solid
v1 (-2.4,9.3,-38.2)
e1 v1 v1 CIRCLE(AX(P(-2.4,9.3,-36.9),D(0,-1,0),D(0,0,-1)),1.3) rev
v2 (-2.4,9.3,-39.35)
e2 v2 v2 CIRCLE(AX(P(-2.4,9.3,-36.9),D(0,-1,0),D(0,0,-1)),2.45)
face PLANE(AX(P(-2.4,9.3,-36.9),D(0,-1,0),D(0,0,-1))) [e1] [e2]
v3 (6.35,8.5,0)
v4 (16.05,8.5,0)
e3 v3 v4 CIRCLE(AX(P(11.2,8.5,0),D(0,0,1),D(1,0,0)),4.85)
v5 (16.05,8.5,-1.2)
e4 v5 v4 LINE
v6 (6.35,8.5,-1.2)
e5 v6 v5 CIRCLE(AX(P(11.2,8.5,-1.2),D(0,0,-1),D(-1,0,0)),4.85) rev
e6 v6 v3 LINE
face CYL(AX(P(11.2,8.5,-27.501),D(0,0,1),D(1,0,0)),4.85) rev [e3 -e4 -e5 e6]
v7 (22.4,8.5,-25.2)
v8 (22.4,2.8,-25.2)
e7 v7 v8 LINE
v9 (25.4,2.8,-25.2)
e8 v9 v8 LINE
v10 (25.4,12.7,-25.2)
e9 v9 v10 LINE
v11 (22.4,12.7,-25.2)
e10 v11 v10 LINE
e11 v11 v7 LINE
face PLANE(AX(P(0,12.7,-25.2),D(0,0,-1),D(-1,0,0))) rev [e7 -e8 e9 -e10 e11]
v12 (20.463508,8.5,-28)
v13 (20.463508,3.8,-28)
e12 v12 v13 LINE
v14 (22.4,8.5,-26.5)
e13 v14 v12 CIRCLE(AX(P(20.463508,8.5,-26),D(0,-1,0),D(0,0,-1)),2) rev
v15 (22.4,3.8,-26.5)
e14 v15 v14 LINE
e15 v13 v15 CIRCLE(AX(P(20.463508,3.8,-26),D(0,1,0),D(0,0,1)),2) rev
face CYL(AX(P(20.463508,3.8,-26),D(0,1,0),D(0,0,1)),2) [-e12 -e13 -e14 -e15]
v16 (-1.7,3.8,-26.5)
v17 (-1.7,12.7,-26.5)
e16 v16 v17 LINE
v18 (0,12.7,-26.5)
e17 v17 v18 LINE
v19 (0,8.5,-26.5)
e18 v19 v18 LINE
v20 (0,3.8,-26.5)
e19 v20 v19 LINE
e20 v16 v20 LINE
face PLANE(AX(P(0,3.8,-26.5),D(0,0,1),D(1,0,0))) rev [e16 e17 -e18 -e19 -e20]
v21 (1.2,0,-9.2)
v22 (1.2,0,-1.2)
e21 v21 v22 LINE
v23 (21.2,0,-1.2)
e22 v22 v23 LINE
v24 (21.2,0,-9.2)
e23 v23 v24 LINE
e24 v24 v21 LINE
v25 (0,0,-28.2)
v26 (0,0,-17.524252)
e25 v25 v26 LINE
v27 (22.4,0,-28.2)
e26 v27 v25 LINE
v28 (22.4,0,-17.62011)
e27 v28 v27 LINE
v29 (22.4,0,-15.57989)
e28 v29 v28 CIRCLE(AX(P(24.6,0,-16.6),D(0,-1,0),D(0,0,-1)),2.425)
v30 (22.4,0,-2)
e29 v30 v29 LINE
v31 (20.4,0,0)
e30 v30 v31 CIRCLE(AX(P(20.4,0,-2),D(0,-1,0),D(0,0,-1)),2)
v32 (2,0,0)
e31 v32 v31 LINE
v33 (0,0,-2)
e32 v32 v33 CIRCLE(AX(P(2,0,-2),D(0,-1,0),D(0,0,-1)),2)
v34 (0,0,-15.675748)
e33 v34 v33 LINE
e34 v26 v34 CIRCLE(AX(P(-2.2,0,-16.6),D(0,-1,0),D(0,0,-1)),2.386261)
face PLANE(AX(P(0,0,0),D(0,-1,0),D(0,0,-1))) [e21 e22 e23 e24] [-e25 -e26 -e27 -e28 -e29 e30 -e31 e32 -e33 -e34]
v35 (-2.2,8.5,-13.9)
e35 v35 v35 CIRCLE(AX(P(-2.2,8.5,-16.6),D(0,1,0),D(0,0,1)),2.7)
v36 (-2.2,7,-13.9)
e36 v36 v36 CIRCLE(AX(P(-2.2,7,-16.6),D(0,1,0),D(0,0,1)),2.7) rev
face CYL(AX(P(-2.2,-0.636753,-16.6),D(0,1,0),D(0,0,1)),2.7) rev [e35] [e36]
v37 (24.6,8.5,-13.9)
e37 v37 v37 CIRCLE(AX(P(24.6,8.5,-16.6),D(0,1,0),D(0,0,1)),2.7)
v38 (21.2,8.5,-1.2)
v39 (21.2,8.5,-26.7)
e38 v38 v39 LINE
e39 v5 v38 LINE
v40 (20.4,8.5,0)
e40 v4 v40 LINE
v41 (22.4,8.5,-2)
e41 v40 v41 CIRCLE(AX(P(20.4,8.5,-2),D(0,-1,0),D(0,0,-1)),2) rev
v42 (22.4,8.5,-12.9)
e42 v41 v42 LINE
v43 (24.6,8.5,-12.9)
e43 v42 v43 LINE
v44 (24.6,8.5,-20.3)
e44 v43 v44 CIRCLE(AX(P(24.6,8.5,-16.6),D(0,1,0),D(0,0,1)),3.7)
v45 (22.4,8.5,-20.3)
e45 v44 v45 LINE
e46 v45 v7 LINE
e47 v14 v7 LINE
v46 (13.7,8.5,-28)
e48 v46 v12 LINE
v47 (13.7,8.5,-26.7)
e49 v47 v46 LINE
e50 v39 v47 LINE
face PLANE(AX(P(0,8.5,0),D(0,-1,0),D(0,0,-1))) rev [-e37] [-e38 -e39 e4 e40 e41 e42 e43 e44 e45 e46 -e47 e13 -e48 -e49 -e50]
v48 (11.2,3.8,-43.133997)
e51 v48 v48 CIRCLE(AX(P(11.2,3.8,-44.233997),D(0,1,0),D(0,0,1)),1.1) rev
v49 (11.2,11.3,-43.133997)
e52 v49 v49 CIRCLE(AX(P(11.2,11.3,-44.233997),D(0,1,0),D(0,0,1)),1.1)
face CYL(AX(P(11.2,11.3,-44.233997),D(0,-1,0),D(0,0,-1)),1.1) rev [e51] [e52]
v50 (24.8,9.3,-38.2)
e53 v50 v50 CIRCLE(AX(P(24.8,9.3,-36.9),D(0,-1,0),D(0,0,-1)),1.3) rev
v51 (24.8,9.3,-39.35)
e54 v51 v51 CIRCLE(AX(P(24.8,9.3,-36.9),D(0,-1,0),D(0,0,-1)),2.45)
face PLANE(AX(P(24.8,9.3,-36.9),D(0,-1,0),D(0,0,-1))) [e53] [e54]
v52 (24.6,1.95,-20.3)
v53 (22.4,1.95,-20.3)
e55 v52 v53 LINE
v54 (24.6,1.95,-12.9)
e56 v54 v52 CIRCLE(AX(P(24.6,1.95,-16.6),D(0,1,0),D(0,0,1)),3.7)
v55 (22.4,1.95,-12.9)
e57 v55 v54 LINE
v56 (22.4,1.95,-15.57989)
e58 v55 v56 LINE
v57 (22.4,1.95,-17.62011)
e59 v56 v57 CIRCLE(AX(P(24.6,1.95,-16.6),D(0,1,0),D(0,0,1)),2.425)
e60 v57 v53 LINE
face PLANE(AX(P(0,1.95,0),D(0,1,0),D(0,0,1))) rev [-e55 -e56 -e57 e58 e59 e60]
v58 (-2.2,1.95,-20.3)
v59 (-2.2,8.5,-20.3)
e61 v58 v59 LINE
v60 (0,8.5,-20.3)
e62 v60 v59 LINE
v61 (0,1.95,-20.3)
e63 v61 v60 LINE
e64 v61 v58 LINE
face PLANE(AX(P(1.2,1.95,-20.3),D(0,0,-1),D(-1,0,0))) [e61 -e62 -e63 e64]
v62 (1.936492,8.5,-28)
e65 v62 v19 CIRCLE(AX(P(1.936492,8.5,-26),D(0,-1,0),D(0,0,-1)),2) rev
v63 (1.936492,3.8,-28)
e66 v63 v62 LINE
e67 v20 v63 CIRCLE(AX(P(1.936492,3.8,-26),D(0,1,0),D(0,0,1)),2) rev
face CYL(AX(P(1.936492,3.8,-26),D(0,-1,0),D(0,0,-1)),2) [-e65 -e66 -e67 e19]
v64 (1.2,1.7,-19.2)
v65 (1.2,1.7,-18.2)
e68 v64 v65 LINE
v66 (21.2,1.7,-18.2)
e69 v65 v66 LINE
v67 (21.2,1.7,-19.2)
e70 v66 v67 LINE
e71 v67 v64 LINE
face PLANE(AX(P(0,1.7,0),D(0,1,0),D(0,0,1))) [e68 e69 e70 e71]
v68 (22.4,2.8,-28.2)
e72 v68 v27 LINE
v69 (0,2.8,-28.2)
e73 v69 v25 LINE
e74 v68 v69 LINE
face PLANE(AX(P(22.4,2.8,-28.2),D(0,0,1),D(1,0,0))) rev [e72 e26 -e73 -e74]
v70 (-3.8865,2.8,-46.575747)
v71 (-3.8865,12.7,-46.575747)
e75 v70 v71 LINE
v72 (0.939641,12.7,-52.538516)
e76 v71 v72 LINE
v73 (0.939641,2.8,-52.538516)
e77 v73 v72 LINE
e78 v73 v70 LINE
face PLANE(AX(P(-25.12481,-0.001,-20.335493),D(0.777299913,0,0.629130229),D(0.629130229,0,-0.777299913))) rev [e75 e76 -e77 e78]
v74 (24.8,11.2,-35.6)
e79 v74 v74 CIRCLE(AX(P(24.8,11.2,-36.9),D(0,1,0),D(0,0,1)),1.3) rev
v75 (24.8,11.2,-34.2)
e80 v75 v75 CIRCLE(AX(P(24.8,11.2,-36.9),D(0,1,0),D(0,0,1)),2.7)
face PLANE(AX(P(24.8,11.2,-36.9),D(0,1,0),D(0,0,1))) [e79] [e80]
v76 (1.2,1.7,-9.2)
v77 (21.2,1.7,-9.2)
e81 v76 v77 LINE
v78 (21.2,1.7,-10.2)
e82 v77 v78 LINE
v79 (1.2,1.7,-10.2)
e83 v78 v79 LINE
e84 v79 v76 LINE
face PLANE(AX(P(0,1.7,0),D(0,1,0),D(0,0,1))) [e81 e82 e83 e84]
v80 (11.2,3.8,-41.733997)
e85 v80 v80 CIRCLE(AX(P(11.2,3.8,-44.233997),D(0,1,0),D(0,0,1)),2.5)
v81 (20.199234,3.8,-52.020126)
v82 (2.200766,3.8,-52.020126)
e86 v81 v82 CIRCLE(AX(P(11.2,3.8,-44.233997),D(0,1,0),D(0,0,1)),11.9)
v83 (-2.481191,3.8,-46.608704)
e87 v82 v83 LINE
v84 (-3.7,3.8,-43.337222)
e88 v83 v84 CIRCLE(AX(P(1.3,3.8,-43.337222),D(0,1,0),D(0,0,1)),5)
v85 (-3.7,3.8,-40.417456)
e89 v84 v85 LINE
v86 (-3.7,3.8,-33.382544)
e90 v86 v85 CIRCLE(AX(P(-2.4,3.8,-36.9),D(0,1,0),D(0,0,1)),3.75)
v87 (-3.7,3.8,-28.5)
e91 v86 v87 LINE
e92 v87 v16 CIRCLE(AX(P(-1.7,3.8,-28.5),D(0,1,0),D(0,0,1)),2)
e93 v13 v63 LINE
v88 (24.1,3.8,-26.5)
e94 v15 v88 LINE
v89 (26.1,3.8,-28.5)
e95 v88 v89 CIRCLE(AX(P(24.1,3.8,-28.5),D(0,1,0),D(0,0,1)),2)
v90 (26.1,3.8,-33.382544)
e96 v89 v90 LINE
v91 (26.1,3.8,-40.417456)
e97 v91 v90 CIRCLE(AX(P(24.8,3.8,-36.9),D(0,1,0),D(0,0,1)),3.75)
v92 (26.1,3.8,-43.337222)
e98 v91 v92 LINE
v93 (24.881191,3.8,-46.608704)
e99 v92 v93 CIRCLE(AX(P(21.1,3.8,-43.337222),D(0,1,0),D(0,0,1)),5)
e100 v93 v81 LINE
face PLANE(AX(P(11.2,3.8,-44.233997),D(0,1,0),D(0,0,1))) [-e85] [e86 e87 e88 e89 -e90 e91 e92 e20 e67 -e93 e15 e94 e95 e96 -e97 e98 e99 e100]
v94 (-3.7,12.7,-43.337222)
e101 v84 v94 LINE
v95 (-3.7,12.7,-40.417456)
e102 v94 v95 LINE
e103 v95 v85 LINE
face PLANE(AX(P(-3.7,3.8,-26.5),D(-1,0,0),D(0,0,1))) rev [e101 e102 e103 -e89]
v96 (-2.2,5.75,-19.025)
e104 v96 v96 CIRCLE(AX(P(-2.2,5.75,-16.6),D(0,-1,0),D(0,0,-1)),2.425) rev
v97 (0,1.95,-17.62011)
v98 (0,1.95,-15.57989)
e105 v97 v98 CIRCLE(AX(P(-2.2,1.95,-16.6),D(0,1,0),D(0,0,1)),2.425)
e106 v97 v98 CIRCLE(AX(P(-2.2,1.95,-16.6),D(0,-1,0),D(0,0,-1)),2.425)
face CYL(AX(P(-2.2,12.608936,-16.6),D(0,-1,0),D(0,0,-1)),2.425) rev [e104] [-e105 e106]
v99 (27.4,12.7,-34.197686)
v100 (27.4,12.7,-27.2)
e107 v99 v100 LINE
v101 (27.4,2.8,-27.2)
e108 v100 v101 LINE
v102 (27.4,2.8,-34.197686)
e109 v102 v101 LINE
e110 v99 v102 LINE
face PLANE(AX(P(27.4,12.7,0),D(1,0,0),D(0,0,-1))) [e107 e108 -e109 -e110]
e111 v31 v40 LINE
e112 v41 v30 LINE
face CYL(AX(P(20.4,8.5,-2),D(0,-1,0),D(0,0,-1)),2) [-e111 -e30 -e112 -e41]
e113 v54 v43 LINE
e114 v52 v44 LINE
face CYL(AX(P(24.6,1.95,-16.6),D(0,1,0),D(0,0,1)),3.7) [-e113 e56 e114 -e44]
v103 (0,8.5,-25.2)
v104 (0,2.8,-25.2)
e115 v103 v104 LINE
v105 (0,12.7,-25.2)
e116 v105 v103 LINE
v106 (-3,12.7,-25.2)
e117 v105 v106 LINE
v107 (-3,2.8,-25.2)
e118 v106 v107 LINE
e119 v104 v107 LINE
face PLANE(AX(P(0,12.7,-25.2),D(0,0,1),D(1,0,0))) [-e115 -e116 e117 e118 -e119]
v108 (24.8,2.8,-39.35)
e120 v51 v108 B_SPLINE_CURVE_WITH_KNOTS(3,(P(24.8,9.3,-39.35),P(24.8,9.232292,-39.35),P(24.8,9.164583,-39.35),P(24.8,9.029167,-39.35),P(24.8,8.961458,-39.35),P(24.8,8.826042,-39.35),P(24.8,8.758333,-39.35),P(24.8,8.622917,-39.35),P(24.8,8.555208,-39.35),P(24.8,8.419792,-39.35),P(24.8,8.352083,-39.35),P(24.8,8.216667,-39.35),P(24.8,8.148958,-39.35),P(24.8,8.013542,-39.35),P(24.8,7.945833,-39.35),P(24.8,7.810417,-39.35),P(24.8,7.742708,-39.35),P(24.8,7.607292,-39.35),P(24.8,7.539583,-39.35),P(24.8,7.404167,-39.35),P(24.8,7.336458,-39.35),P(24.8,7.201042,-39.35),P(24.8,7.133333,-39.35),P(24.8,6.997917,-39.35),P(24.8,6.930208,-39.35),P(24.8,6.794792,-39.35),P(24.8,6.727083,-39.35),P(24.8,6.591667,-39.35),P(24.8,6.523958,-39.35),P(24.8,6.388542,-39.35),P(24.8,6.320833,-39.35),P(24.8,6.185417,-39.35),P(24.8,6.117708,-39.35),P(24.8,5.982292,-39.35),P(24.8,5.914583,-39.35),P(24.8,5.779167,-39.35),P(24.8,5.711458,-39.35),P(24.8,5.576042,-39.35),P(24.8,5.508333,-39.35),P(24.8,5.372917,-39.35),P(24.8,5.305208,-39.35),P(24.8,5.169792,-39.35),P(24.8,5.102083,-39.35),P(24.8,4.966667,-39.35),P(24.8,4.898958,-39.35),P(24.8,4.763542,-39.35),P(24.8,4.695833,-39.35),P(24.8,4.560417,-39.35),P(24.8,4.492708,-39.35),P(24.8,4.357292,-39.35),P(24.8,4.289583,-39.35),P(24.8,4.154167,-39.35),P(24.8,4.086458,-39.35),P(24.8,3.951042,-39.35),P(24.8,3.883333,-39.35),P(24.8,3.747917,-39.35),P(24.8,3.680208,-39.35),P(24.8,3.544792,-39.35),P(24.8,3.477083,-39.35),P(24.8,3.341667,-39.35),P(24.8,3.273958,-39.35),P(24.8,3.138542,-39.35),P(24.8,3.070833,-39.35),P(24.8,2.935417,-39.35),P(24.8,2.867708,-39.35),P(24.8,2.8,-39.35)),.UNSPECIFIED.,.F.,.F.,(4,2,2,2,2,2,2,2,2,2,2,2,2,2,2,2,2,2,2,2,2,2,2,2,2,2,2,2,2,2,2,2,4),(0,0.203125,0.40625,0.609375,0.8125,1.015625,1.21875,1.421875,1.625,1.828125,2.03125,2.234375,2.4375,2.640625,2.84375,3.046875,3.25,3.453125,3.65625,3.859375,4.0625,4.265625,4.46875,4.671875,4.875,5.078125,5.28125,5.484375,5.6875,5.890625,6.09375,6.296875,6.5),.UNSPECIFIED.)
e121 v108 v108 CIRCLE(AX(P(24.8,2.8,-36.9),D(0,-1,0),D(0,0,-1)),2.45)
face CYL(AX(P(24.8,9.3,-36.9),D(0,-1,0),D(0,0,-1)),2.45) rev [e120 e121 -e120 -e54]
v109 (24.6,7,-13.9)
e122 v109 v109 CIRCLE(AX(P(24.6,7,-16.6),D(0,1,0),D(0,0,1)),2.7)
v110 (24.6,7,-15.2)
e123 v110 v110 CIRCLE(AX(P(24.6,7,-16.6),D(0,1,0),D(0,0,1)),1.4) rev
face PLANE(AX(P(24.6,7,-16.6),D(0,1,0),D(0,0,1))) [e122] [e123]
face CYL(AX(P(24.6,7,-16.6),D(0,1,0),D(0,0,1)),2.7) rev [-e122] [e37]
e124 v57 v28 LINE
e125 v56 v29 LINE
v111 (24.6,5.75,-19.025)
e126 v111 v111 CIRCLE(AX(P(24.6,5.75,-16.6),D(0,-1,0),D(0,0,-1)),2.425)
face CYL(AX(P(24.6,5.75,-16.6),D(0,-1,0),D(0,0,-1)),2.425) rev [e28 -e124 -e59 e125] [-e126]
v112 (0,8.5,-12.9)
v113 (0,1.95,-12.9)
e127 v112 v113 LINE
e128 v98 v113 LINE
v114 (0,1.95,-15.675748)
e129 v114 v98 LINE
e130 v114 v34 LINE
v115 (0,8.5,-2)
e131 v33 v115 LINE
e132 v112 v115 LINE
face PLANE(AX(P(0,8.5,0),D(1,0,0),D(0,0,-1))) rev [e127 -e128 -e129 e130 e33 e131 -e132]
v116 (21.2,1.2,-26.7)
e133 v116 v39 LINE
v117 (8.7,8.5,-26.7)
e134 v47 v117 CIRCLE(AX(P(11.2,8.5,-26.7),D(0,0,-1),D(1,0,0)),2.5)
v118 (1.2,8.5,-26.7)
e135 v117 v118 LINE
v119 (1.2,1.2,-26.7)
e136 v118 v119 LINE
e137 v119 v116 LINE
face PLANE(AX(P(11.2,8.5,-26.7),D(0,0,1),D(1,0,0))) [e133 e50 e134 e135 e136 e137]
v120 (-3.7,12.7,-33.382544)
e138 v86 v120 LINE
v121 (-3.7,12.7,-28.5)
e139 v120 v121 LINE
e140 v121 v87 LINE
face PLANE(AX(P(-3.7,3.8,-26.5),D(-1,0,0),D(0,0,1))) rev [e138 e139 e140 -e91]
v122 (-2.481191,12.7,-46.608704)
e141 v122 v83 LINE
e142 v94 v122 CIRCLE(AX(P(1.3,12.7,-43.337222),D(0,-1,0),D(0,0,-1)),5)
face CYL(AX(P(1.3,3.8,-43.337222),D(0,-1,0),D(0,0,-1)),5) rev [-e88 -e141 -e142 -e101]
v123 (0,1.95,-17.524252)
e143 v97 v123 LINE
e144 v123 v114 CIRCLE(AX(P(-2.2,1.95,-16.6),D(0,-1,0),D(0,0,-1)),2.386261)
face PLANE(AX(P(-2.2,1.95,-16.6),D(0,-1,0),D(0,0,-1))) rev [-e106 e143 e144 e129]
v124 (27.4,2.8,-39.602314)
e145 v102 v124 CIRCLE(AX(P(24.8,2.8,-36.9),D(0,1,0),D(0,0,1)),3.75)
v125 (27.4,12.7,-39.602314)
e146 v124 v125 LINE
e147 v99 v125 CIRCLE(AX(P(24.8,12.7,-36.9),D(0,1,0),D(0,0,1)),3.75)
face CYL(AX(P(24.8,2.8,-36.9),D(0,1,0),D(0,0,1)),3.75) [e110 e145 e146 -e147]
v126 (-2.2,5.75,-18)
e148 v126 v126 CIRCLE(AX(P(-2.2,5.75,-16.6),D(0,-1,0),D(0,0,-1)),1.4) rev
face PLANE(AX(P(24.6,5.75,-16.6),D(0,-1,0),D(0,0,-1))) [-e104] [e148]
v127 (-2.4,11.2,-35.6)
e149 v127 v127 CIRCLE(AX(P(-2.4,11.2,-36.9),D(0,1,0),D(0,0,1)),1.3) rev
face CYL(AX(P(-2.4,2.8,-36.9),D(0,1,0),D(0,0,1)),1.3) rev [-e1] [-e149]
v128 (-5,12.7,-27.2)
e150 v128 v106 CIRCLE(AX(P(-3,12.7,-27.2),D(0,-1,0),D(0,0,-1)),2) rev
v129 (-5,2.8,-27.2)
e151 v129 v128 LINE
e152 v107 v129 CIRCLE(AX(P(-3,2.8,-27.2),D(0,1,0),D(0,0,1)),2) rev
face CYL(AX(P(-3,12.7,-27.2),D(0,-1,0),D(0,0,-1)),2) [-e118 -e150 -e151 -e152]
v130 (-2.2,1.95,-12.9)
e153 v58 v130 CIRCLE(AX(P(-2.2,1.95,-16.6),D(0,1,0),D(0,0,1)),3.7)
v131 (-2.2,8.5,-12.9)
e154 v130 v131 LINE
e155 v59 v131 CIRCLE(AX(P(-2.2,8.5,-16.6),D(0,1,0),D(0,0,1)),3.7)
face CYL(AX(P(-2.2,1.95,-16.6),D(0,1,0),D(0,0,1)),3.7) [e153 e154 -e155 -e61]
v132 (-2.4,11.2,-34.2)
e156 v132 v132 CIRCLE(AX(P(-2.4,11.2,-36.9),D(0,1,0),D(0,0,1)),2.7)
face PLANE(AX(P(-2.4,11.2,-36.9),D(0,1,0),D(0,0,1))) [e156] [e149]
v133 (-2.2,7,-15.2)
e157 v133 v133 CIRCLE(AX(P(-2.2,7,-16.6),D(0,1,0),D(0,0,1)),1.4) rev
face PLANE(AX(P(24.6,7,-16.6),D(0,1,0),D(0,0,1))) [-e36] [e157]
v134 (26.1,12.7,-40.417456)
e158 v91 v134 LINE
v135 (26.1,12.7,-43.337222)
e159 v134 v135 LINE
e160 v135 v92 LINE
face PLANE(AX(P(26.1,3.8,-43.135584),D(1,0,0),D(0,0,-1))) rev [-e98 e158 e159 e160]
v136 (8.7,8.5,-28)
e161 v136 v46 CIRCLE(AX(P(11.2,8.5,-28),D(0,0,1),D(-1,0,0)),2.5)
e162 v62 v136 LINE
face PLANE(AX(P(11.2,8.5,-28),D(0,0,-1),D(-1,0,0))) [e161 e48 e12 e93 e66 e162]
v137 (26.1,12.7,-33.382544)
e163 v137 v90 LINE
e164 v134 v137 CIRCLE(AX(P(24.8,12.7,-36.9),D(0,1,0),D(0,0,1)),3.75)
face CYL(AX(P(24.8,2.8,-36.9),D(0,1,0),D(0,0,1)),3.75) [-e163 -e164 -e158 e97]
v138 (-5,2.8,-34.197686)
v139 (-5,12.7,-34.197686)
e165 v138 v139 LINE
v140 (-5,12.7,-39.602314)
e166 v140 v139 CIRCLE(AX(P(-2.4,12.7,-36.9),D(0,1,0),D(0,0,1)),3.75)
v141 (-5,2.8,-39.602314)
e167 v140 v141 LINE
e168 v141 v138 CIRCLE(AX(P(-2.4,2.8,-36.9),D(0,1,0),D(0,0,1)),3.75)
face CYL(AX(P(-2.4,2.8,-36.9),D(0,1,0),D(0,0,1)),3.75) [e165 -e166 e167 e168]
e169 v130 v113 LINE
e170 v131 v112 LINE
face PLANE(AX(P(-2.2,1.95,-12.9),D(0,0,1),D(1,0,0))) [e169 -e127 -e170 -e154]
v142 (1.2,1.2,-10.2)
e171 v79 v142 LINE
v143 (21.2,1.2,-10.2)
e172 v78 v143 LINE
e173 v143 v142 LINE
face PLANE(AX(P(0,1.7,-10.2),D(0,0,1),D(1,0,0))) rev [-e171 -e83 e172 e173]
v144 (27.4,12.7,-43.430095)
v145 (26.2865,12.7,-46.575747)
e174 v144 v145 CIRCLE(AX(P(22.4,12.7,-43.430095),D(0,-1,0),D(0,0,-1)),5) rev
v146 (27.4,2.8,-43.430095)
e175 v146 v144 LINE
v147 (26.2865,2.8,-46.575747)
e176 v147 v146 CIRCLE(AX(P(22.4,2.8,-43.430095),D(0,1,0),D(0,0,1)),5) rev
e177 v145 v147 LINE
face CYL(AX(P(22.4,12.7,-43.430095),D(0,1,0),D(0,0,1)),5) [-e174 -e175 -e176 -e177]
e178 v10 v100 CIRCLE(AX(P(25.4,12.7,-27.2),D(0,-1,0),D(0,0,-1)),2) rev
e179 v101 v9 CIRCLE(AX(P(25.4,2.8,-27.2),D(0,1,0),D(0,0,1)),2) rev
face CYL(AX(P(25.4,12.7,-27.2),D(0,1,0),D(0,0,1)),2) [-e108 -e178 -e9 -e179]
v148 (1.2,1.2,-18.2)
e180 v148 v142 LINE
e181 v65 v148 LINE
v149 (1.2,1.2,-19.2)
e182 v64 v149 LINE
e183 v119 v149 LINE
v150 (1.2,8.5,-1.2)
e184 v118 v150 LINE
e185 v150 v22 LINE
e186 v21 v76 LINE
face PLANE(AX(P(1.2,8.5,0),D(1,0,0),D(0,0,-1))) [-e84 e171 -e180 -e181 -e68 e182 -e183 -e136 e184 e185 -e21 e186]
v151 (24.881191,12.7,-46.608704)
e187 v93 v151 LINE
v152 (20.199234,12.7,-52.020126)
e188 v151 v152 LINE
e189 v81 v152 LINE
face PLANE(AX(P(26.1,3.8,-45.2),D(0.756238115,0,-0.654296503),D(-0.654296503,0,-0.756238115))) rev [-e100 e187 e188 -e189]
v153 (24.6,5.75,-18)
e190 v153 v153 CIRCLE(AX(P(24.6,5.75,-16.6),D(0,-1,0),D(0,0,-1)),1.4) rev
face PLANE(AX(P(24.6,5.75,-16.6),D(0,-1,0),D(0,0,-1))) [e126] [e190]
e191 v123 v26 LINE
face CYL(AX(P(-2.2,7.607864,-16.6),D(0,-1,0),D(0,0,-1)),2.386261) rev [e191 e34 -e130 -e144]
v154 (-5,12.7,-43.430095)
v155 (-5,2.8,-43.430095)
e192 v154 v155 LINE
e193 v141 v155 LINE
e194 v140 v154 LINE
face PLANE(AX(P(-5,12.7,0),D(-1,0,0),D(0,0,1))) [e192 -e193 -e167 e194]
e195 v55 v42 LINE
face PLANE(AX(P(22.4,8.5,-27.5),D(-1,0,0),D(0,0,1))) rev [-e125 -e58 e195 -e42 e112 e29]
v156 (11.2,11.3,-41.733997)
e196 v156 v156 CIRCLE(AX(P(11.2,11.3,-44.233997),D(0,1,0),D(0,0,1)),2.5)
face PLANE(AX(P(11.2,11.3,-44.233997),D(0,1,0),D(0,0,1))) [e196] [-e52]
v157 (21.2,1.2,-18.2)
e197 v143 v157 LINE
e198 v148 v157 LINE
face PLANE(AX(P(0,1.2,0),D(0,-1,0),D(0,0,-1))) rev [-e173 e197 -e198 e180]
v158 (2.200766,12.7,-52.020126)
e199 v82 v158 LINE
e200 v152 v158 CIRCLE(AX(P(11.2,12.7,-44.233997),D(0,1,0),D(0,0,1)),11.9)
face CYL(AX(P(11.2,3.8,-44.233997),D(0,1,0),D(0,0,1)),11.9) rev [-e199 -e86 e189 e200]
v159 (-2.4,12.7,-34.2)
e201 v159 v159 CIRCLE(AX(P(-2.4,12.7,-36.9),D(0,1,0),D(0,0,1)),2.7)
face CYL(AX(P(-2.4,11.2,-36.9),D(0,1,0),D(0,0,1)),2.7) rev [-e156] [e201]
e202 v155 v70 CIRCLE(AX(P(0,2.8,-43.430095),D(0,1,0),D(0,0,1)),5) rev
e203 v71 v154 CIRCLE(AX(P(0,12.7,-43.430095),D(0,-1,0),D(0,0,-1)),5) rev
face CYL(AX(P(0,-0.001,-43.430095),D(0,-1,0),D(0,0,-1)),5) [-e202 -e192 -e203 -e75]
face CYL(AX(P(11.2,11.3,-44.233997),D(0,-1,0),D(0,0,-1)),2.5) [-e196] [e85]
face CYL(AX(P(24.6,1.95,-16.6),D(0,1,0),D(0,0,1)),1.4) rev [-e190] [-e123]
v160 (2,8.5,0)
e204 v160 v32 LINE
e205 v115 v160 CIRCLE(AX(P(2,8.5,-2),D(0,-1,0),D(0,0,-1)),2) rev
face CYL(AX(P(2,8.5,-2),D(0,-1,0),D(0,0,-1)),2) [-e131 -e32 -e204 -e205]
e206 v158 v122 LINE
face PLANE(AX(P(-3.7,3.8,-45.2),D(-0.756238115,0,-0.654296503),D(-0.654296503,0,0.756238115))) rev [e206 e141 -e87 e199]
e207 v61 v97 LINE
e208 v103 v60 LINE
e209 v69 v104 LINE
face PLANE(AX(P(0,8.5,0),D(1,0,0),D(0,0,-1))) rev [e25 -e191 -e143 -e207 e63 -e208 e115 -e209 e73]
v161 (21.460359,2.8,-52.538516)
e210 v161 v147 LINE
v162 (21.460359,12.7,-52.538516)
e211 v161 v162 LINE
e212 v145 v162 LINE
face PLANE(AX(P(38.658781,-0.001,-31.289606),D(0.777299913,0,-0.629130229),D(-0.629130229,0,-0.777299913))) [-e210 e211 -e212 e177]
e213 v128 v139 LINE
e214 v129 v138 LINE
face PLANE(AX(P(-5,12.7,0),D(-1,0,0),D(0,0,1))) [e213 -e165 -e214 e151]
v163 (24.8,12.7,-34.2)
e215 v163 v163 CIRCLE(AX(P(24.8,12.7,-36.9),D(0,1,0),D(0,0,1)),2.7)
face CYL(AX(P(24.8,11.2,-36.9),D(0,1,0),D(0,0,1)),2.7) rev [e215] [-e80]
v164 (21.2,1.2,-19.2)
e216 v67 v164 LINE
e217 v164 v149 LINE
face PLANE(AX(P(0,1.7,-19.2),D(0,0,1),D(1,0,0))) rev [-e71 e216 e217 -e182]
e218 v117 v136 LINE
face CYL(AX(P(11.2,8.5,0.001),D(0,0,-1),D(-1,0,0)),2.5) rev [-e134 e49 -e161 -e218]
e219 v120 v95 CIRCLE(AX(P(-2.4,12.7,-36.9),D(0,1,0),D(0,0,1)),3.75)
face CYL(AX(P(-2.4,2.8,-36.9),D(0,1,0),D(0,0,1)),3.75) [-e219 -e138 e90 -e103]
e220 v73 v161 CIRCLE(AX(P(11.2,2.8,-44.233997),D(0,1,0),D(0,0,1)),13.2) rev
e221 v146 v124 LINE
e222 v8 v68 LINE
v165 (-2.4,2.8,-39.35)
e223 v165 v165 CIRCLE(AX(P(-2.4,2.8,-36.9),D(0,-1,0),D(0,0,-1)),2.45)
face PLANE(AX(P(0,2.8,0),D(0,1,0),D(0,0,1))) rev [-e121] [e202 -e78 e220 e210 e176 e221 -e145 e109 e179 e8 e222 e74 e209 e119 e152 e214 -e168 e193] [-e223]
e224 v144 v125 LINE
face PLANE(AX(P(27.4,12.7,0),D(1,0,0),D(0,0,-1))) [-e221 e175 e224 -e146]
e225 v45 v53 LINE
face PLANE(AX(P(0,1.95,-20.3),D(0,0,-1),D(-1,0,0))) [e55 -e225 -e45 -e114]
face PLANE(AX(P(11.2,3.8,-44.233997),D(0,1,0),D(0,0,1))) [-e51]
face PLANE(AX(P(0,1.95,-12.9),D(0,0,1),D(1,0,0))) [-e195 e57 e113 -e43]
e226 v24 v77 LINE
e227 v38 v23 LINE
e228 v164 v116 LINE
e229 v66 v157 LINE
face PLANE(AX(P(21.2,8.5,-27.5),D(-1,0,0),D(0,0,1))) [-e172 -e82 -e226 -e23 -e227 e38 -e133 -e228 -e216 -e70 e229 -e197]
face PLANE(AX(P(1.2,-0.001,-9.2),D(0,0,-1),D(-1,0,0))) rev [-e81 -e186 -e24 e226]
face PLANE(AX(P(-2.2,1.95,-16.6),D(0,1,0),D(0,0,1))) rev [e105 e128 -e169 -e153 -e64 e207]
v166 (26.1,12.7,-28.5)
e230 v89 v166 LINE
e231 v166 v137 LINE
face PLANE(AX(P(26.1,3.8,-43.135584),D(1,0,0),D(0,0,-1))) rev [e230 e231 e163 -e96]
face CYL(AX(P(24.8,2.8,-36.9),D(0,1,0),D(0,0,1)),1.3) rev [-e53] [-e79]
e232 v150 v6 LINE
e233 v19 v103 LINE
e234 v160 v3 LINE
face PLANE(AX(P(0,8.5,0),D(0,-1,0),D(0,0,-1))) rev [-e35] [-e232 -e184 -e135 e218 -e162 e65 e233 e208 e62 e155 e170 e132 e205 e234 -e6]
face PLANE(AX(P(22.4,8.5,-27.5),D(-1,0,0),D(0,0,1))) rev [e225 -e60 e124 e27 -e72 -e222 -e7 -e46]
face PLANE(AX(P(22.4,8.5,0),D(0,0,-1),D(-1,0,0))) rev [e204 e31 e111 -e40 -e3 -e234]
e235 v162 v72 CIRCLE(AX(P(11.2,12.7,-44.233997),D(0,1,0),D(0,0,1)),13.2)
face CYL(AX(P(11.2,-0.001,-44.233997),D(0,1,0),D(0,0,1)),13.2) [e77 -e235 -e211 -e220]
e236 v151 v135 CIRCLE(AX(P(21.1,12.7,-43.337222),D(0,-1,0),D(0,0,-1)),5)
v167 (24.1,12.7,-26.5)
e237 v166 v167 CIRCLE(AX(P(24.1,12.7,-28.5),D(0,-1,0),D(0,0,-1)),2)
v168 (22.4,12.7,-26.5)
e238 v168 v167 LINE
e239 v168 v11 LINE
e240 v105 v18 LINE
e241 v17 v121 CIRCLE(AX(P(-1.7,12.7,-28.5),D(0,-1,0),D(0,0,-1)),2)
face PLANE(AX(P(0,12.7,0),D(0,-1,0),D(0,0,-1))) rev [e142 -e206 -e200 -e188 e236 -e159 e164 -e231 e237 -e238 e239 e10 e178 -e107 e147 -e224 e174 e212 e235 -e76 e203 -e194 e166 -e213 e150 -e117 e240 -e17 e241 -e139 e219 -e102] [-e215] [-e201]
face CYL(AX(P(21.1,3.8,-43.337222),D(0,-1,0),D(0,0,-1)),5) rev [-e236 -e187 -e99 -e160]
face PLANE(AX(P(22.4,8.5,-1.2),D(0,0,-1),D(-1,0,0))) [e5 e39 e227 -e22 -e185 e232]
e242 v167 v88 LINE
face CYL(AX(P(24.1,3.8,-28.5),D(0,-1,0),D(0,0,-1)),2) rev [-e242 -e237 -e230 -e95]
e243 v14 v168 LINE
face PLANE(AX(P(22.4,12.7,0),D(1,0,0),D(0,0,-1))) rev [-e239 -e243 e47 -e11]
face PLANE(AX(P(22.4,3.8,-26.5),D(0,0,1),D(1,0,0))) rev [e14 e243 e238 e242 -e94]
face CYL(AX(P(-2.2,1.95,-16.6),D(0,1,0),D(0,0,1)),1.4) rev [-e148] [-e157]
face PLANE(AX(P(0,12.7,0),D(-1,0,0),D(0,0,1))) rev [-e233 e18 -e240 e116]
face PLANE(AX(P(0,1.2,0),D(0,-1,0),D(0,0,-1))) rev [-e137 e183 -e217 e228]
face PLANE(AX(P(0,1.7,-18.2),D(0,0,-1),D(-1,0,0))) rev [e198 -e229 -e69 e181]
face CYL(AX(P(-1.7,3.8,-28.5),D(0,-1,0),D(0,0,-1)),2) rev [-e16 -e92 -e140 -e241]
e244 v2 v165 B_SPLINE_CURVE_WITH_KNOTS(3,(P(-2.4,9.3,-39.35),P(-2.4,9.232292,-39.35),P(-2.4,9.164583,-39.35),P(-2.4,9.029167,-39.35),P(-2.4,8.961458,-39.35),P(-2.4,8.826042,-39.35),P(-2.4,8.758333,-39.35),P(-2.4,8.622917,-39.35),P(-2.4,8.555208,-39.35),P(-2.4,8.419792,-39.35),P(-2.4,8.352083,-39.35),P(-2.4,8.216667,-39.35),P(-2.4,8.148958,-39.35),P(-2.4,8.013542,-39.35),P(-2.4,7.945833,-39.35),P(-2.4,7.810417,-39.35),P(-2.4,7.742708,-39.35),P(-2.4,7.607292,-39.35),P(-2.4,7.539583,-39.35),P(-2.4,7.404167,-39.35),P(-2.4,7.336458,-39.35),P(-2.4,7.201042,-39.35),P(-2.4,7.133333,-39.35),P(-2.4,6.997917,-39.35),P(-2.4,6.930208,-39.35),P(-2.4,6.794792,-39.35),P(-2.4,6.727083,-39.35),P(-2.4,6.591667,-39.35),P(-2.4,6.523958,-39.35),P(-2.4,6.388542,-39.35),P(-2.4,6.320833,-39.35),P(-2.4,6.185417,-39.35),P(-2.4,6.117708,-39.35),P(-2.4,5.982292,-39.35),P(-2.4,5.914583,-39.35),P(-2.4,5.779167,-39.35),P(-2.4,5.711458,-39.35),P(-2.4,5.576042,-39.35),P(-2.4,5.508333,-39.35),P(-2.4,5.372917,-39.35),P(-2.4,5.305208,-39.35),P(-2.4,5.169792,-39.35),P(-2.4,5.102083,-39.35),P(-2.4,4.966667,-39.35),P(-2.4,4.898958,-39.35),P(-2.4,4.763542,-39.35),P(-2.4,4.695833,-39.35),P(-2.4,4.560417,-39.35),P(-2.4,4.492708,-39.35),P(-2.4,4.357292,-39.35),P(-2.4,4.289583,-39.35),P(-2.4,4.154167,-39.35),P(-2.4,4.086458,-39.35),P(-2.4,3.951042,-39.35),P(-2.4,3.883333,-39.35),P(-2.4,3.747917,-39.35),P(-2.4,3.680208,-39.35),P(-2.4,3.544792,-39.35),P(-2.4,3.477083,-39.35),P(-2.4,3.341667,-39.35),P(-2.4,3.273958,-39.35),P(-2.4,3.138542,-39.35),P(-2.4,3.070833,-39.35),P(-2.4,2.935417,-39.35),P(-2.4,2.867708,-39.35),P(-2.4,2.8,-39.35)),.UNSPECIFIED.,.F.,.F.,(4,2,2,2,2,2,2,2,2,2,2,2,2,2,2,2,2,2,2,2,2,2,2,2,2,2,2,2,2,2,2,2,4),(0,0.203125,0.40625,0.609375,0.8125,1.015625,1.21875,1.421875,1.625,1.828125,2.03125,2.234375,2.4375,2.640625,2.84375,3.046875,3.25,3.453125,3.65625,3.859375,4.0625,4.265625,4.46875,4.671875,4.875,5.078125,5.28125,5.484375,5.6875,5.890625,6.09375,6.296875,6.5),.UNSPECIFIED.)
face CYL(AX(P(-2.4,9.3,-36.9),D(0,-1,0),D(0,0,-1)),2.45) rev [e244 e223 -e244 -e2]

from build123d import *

# Parameters (mm, degrees)
CROQUIS1_W               = 22.4
CROQUIS1_H               = 27.5
SALIENTE_EXTRUIR3_DEPTH  = 8.5
VACIADO5_T               = -1.2
CORTAR_EXTRUIR8_REACH    = 38.473
CORTAR_EXTRUIR9_REACH    = 38.212
CROQUIS10_W              = 20
CROQUIS10_H              = 8
CROQUIS11_W              = 20
CROQUIS11_H              = 1
SALIENTE_EXTRUIR4_DEPTH  = 0.5
CORTAR_EXTRUIR10_REACH   = 38.473
SALIENTE_EXTRUIR7_DEPTH  = 12.7
CORTAR_EXTRUIR11_DEPTH   = 2.8
CORTAR_EXTRUIR12_REACH   = 66.948
CORTAR_EXTRUIR13_DEPTH   = 8.9
SALIENTE_EXTRUIR8_START  = 0.5
SALIENTE_EXTRUIR8_DEPTH  = 0.5
CORTAR_EXTRUIR14_START   = -0.4
CORTAR_EXTRUIR14_DEPTH   = 0.4
CROQUIS23_R              = 2.5
CROQUIS23_R_2            = 1.1
SALIENTE_EXTRUIR10_DEPTH = 7.5
SALIENTE_EXTRUIR11_START = -9.9
CROQUIS24_R              = 3.75
CROQUIS24_R_2            = 1.3
SALIENTE_EXTRUIR11_DEPTH = 9.9
CORTAR_EXTRUIR18_REACH   = 66.753
CROQUIS25_R              = 1.3
CROQUIS26_R              = 2.7
CORTAR_EXTRUIR19_DEPTH   = 1.5
CROQUIS27_R              = 2.45
CORTAR_EXTRUIR20_DEPTH   = 6.5
CROQUIS29_R              = 1.4
SALIENTE_EXTRUIR12_DEPTH = 6.55
CROQUIS30_R              = 2.7
CORTAR_EXTRUIR21_DEPTH   = 1.5
CROQUIS31_R              = 2.425
CORTAR_EXTRUIR22_DEPTH   = 3.8
CORTAR_EXTRUIR23_DEPTH   = 3.8
CROQUIS37_R              = 1.4
SALIENTE_EXTRUIR16_DEPTH = 6.55
CROQUIS41_R              = 2.7
CORTAR_EXTRUIR25_DEPTH   = 1.5
CROQUIS42_R              = 2.425
CORTAR_EXTRUIR26_DEPTH   = 3.8
CORTAR_EXTRUIR27_DEPTH   = 5.75
REDONDEO2_R              = 5
REDONDEO3_R              = 2


with BuildPart() as part:
    # Croquis1 → Saliente-Extruir3 (new body)
    with BuildSketch(Plane(origin=(0, 0, 0), x_dir=(1, 0, 0), z_dir=(0, 1, 0))):
        with Locations((11.2, 13.75)):
            Rectangle(CROQUIS1_W, CROQUIS1_H)
    extrude(amount=SALIENTE_EXTRUIR3_DEPTH)

    # Vaciado5
    vaciado5_openings = [part.faces().sort_by_distance(p)[0] for p in [
        (11.2, 8.5, -13.75),
    ]]
    offset(amount=VACIADO5_T, openings=vaciado5_openings, kind=Kind.INTERSECTION)

    # Croquis9 → Cortar-Extruir8 (cut, up to next)
    with BuildSketch(Plane.XY, mode=Mode.PRIVATE) as cortar_extruir8_sk1:
        with BuildLine():
            Line((6.35, 8.5), (16.05, 8.5))
            ThreePointArc((16.05, 8.5), (11.2, 3.65), (6.35, 8.5))
        make_face()
    cortar_extruir8_tool1 = extrude(cortar_extruir8_sk1.sketch, amount=-CORTAR_EXTRUIR8_REACH, mode=Mode.PRIVATE) & part.part
    add(cortar_extruir8_tool1.solids().sort_by_distance((11.2, 6.441596, 0))[0], mode=Mode.SUBTRACT)

    # Croquis10 → Cortar-Extruir9 (cut, up to next)
    with BuildSketch(Plane(origin=(0, 1.2, 0), x_dir=(1, 0, 0), z_dir=(0, 1, 0)), mode=Mode.PRIVATE) as cortar_extruir9_sk1:
        with Locations((11.2, 5.2)):
            Rectangle(CROQUIS10_W, CROQUIS10_H)
    cortar_extruir9_tool1 = extrude(cortar_extruir9_sk1.sketch, amount=-CORTAR_EXTRUIR9_REACH, mode=Mode.PRIVATE) & part.part
    add(cortar_extruir9_tool1.solids().sort_by_distance((11.2, 1.2, -5.2))[0], mode=Mode.SUBTRACT)

    # Croquis11 → Saliente-Extruir4 (add)
    with BuildSketch(Plane(origin=(0, 1.2, 0), x_dir=(1, 0, 0), z_dir=(0, 1, 0))):
        with Locations((11.2, 18.7)):
            Rectangle(CROQUIS11_W, CROQUIS11_H)
        with Locations((11.2, 9.7)):
            Rectangle(CROQUIS11_W, CROQUIS11_H)
    extrude(amount=SALIENTE_EXTRUIR4_DEPTH)

    # Croquis12 → Cortar-Extruir10 (cut, up to next)
    with BuildSketch(Plane(origin=(0, 0, -27.5), x_dir=(-1, 0, 0), z_dir=(0, 0, -1)), mode=Mode.PRIVATE) as cortar_extruir10_sk1:
        with BuildLine():
            Line((-13.7, 8.5), (-8.7, 8.5))
            ThreePointArc((-8.7, 8.5), (-11.2, 6), (-13.7, 8.5))
        make_face()
    cortar_extruir10_tool1 = extrude(cortar_extruir10_sk1.sketch, amount=-CORTAR_EXTRUIR10_REACH, mode=Mode.PRIVATE) & part.part
    add(cortar_extruir10_tool1.solids().sort_by_distance((11.2, 7.438967, -27.5))[0], mode=Mode.SUBTRACT)

    # Croquis15 → Saliente-Extruir7 (add)
    with BuildSketch(Plane.XZ):
        Polygon((11.2, -57.5), (11.2, -27.5), (0, -27.5), (0, -25.2), (-5, -25.2), (-5, -57.5), align=None)
        Polygon((22.4, -25.2), (22.4, -27.5), (11.2, -27.5), (11.2, -57.5), (27.4, -57.5), (27.4, -25.2), align=None)
    extrude(amount=-SALIENTE_EXTRUIR7_DEPTH)

    # Croquis16 → Cortar-Extruir11 (cut)
    with BuildSketch(Plane.XZ):
        Polygon((0, -25.2), (-5, -25.2), (-5, -57.5), (27.4, -57.5), (27.4, -25.2), (22.4, -25.2), (22.4, -28.2), (0, -28.2), align=None)
    extrude(amount=-CORTAR_EXTRUIR11_DEPTH, mode=Mode.SUBTRACT)

    # Croquis17 → Cortar-Extruir12 (cut, up to next)
    with BuildSketch(Plane(origin=(0, 12.7, 0), x_dir=(1, 0, 0), z_dir=(0, 1, 0)), mode=Mode.PRIVATE) as cortar_extruir12_sk1:
        with BuildLine():
            Line((11.2, 57.43399745), (11.2, 57.5))
            Line((11.2, 57.5), (-5, 57.5))
            Line((-5, 57.5), (-5, 45.2))
            Line((-5, 45.2), (0.939641145, 52.538516471))
            ThreePointArc((0.939641145, 52.538516471), (5.515796057, 56.147427919), (11.2, 57.43399745))
        make_face()
    cortar_extruir12_tool1 = extrude(cortar_extruir12_sk1.sketch, amount=-CORTAR_EXTRUIR12_REACH, mode=Mode.PRIVATE) & part.part
    # Croquis17 → Cortar-Extruir12 (cut, up to next)
    with BuildSketch(Plane(origin=(0, 12.7, 0), x_dir=(1, 0, 0), z_dir=(0, 1, 0)), mode=Mode.PRIVATE) as cortar_extruir12_sk2:
        with BuildLine():
            Line((27.4, 57.5), (11.2, 57.5))
            Line((11.2, 57.5), (11.2, 57.43399745))
            ThreePointArc((11.2, 57.43399745), (16.884203943, 56.147427919), (21.460358855, 52.538516471))
            Line((21.460358855, 52.538516471), (27.4, 45.2))
            Line((27.4, 45.2), (27.4, 57.5))
        make_face()
    cortar_extruir12_tool2 = extrude(cortar_extruir12_sk2.sketch, amount=-CORTAR_EXTRUIR12_REACH, mode=Mode.PRIVATE) & part.part
    add(cortar_extruir12_tool1.solids().sort_by_distance((-1.036226, 12.7, -53.675215))[0], mode=Mode.SUBTRACT)
    add(cortar_extruir12_tool2.solids().sort_by_distance((23.436226, 12.7, -53.675215))[0], mode=Mode.SUBTRACT)

    # Croquis19 → Cortar-Extruir13 (cut)
    with BuildSketch(Plane(origin=(0, 12.7, 0), x_dir=(1, 0, 0), z_dir=(0, 1, 0))):
        with BuildLine():
            Line((0, 26.5), (0, 27.5))
            Line((0, 27.5), (22.4, 27.5))
            Line((22.4, 27.5), (22.4, 26.5))
            Line((22.4, 26.5), (26.1, 26.5))
            Line((26.1, 26.5), (26.1, 43.135584459))
            Line((26.1, 43.135584459), (26.1, 45.2))
            Line((26.1, 45.2), (20.199233565, 52.020125835))
            ThreePointArc((20.199233565, 52.020125835), (11.2, 56.13399745), (2.200766435, 52.020125835))
            Line((2.200766435, 52.020125835), (-3.7, 45.2))
            Line((-3.7, 45.2), (-3.7, 42.955864672))
            Line((-3.7, 42.955864672), (-3.7, 26.5))
            Line((-3.7, 26.5), (0, 26.5))
        make_face()
    extrude(amount=-CORTAR_EXTRUIR13_DEPTH, mode=Mode.SUBTRACT)

    # Croquis20 → Saliente-Extruir8 (add)
    with BuildSketch(Plane(origin=(0, 0, -27.5), x_dir=(-1, 0, 0), z_dir=(0, 0, -1)).offset(SALIENTE_EXTRUIR8_START)):
        with BuildLine():
            Line((0, 8.5), (0, 3.8))
            Line((0, 3.8), (-22.4, 3.8))
            Line((-22.4, 3.8), (-22.4, 8.5))
            Line((-22.4, 8.5), (-13.7, 8.5))
            ThreePointArc((-13.7, 8.5), (-11.2, 6), (-8.7, 8.5))
            Line((-8.7, 8.5), (0, 8.5))
        make_face()
    extrude(amount=-SALIENTE_EXTRUIR8_DEPTH)

    # Croquis22 → Cortar-Extruir14 (cut)
    with BuildSketch(Plane.XY.offset(-26.3).offset(CORTAR_EXTRUIR14_START)):
        with BuildLine():
            Line((1.2, 8.5), (8.7, 8.5))
            ThreePointArc((8.7, 8.5), (11.2, 6), (13.7, 8.5))
            Line((13.7, 8.5), (21.2, 8.5))
            Line((21.2, 8.5), (21.2, 1.2))
            Line((21.2, 1.2), (1.2, 1.2))
            Line((1.2, 1.2), (1.2, 8.5))
        make_face()
    extrude(amount=CORTAR_EXTRUIR14_DEPTH, mode=Mode.SUBTRACT)

    # Croquis23 → Saliente-Extruir10 (add)
    with BuildSketch(Plane(origin=(0, 3.8, 0), x_dir=(1, 0, 0), z_dir=(0, 1, 0))):
        with Locations(Location((11.2, 44.23399745, 0), (0, 0, 270))):
            Circle(CROQUIS23_R)
        with Locations(Location((11.2, 44.23399745, 0), (0, 0, 270))):
            Circle(CROQUIS23_R_2, mode=Mode.SUBTRACT)
    extrude(amount=SALIENTE_EXTRUIR10_DEPTH)

    # Croquis24 → Saliente-Extruir11 (add)
    # profile 1 of 2: a face of its own
    with BuildSketch(Plane(origin=(0, 12.7, 0), x_dir=(1, 0, 0), z_dir=(0, 1, 0)).offset(SALIENTE_EXTRUIR11_START)):
        with Locations((24.8, 36.9)):
            Circle(CROQUIS24_R)
        with Locations(Location((24.8, 36.9, 0), (0, 0, 270))):
            Circle(CROQUIS24_R_2, mode=Mode.SUBTRACT)
    # profile 2 of 2: a face of its own
    with BuildSketch(Plane(origin=(0, 12.7, 0), x_dir=(1, 0, 0), z_dir=(0, 1, 0)).offset(SALIENTE_EXTRUIR11_START)):
        with Locations((-2.4, 36.9)):
            Circle(CROQUIS24_R)
        with Locations(Location((-2.4, 36.9, 0), (0, 0, 270))):
            Circle(CROQUIS24_R_2, mode=Mode.SUBTRACT)
    extrude(amount=SALIENTE_EXTRUIR11_DEPTH)

    # Croquis25 → Cortar-Extruir18 (cut, up to next)
    with BuildSketch(Plane(origin=(0, 3.8, 0), x_dir=(1, 0, 0), z_dir=(0, 1, 0)), mode=Mode.PRIVATE) as cortar_extruir18_sk1:
        with Locations(Location((24.8, 36.9, 0), (0, 0, 270))):
            Circle(CROQUIS25_R)
    cortar_extruir18_tool1 = extrude(cortar_extruir18_sk1.sketch, amount=-CORTAR_EXTRUIR18_REACH, mode=Mode.PRIVATE) & part.part
    # Croquis25 → Cortar-Extruir18 (cut, up to next)
    with BuildSketch(Plane(origin=(0, 3.8, 0), x_dir=(1, 0, 0), z_dir=(0, 1, 0)), mode=Mode.PRIVATE) as cortar_extruir18_sk2:
        with Locations(Location((-2.4, 36.9, 0), (0, 0, 270))):
            Circle(CROQUIS25_R)
    cortar_extruir18_tool2 = extrude(cortar_extruir18_sk2.sketch, amount=-CORTAR_EXTRUIR18_REACH, mode=Mode.PRIVATE) & part.part
    add(cortar_extruir18_tool1.solids().sort_by_distance((24.8, 3.8, -36.9))[0], mode=Mode.SUBTRACT)
    add(cortar_extruir18_tool2.solids().sort_by_distance((-2.4, 3.8, -36.9))[0], mode=Mode.SUBTRACT)

    # Croquis26 → Cortar-Extruir19 (cut)
    with BuildSketch(Plane(origin=(0, 12.7, 0), x_dir=(1, 0, 0), z_dir=(0, 1, 0))):
        with Locations(Location((24.8, 36.9, 0), (0, 0, 270))):
            Circle(CROQUIS26_R)
        with Locations(Location((-2.4, 36.9, 0), (0, 0, 270))):
            Circle(CROQUIS26_R)
    extrude(amount=-CORTAR_EXTRUIR19_DEPTH, mode=Mode.SUBTRACT)

    # Croquis27 → Cortar-Extruir20 (cut)
    with BuildSketch(Plane.XZ.offset(-2.8)):
        with Locations(Location((-2.4, -36.9, 0), (0, 0, 270))):
            Circle(CROQUIS27_R)
        with Locations(Location((24.8, -36.9, 0), (0, 0, 270))):
            Circle(CROQUIS27_R)
    extrude(amount=-CORTAR_EXTRUIR20_DEPTH, mode=Mode.SUBTRACT)

    # Croquis29 → Saliente-Extruir12 (add)
    with BuildSketch(Plane(origin=(0, 8.5, 0), x_dir=(1, 0, 0), z_dir=(0, 1, 0))):
        with BuildLine():
            ThreePointArc((24.6, 12.9), (28.3, 16.6), (24.6, 20.3))
            Line((24.6, 20.3), (22.4, 20.3))
            Line((22.4, 20.3), (21.2, 20.3))
            Line((21.2, 20.3), (21.2, 12.9))
            Line((21.2, 12.9), (22.4, 12.9))
            Line((22.4, 12.9), (24.6, 12.9))
        make_face()
        with Locations(Location((24.6, 16.6, 0), (0, 0, 270))):
            Circle(CROQUIS29_R, mode=Mode.SUBTRACT)
    extrude(amount=-SALIENTE_EXTRUIR12_DEPTH)

    # Croquis30 → Cortar-Extruir21 (cut)
    with BuildSketch(Plane(origin=(0, 8.5, 0), x_dir=(1, 0, 0), z_dir=(0, 1, 0))):
        with Locations(Location((24.6, 16.6, 0), (0, 0, 270))):
            Circle(CROQUIS30_R)
    extrude(amount=-CORTAR_EXTRUIR21_DEPTH, mode=Mode.SUBTRACT)

    # Croquis31 → Cortar-Extruir22 (cut)
    with BuildSketch(Plane.XZ.offset(-1.95)):
        with Locations(Location((24.6, -16.6, 0), (0, 0, 270))):
            Circle(CROQUIS31_R)
    extrude(amount=-CORTAR_EXTRUIR22_DEPTH, mode=Mode.SUBTRACT)

    # Croquis32 → Cortar-Extruir23 (cut)
    with BuildSketch(Plane.XZ):
        with BuildLine():
            Line((22.4, -15.579889712), (22.4, -17.620110288))
            ThreePointArc((22.4, -17.620110288), (22.175, -16.6), (22.4, -15.579889712))
        make_face()
    extrude(amount=-CORTAR_EXTRUIR23_DEPTH, mode=Mode.SUBTRACT)

    # Croquis37 → Saliente-Extruir16 (add)
    with BuildSketch(Plane(origin=(0, 8.5, 0), x_dir=(1, 0, 0), z_dir=(0, 1, 0))):
        with BuildLine():
            Line((1.2, 12.9), (1.2, 20.3))
            Line((1.2, 20.3), (-2.2, 20.3))
            ThreePointArc((-2.2, 20.3), (-5.9, 16.6), (-2.2, 12.9))
            Line((-2.2, 12.9), (1.2, 12.9))
        make_face()
        with Locations(Location((-2.2, 16.6, 0), (0, 0, 270))):
            Circle(CROQUIS37_R, mode=Mode.SUBTRACT)
    extrude(amount=-SALIENTE_EXTRUIR16_DEPTH)

    # Croquis41 → Cortar-Extruir25 (cut)
    with BuildSketch(Plane(origin=(0, 8.5, 0), x_dir=(1, 0, 0), z_dir=(0, 1, 0))):
        with Locations(Location((-2.2, 16.6, 0), (0, 0, 270))):
            Circle(CROQUIS41_R)
    extrude(amount=-CORTAR_EXTRUIR25_DEPTH, mode=Mode.SUBTRACT)

    # Croquis42 → Cortar-Extruir26 (cut)
    with BuildSketch(Plane.XZ.offset(-1.95)):
        with Locations(Location((-2.2, -16.6, 0), (0, 0, 270))):
            Circle(CROQUIS42_R)
    extrude(amount=-CORTAR_EXTRUIR26_DEPTH, mode=Mode.SUBTRACT)

    # Croquis43 → Cortar-Extruir27 (cut)
    with BuildSketch(Plane.XZ):
        with BuildLine():
            Line((0, -15.675748238), (0, -17.524251762))
            ThreePointArc((0, -17.524251762), (0.186260949, -16.6), (0, -15.675748238))
        make_face()
    extrude(amount=-CORTAR_EXTRUIR27_DEPTH, mode=Mode.SUBTRACT)

    # Redondeo2
    redondeo2_edges = [part.edges().sort_by_distance(p)[0] for p in [
        (-5, 7.75, -45.2),
        (27.4, 7.75, -45.2),
        (-3.7, 8.25, -45.2),
        (26.1, 8.25, -45.2),
    ]]
    fillet(redondeo2_edges, radius=REDONDEO2_R)

    # Redondeo3
    # the kernel refuses this fillet: 2 mm, written as the material it adds along each edge
    with BuildSketch(Plane(origin=(-3.7, 12.7, -26.5), x_dir=(1, 0, 0), z_dir=(0, -1, 0))) as redondeo3_piece_1:
        with BuildLine():
            CenterArc((REDONDEO3_R, -REDONDEO3_R), REDONDEO3_R, 90, 90)
            Line((0, -REDONDEO3_R), (0, 0))
            Line((0, 0), (REDONDEO3_R, 0))
        make_face()
    extrude(amount=8.9)
    with BuildSketch(Plane(origin=(26.1, 12.7, -26.5), x_dir=(-1, 0, 0), z_dir=(0, -1, 0))) as redondeo3_piece_2:
        with BuildLine():
            CenterArc((REDONDEO3_R, REDONDEO3_R), REDONDEO3_R, 180, 90)
            Line((0, REDONDEO3_R), (0, 0))
            Line((0, 0), (REDONDEO3_R, 0))
        make_face()
    extrude(amount=8.9)
    # the kernel refuses this fillet: 2 mm, written as the material it takes off along each edge
    with BuildSketch(Plane(origin=(0, -5, 0), x_dir=(1, 0, 0), z_dir=(0, 1, 0))) as redondeo3_2_piece_1:
        with BuildLine():
            CenterArc((REDONDEO3_R, REDONDEO3_R), REDONDEO3_R, 180, 90)
            Line((0, REDONDEO3_R), (0, 0))
            Line((0, 0), (REDONDEO3_R, 0))
        make_face()
    extrude(amount=18.5, mode=Mode.SUBTRACT)
    with BuildSketch(Plane(origin=(22.4, -5, 0), x_dir=(-1, 0, 0), z_dir=(0, 1, 0))) as redondeo3_2_piece_2:
        with BuildLine():
            CenterArc((REDONDEO3_R, -REDONDEO3_R), REDONDEO3_R, 90, 90)
            Line((0, -REDONDEO3_R), (0, 0))
            Line((0, 0), (REDONDEO3_R, 0))
        make_face()
    extrude(amount=18.5, mode=Mode.SUBTRACT)
    with BuildSketch(Plane(origin=(0, 13.341229183, -28), x_dir=(0, 0, 1), z_dir=(0, -1, 0)), Plane(origin=(22.4, 3.8, -28), x_dir=(0, 0, 1), z_dir=(0, 1, 0))) as redondeo3_2_piece_3:
        with BuildLine():
            CenterArc((2, -1.936491673), REDONDEO3_R, 104.477512186, 75.522487814)
            Line((0, -1.936491673), (0, 0))
            Line((0, 0), (1.5, 0))
        make_face()
    extrude(amount=9.541229183, mode=Mode.SUBTRACT)
    with BuildSketch(Plane(origin=(-5, -2.2, -25.2), x_dir=(0, 0, -1), z_dir=(0, 1, 0))) as redondeo3_2_piece_4:
        with BuildLine():
            CenterArc((REDONDEO3_R, -REDONDEO3_R), REDONDEO3_R, 90, 90)
            Line((0, -REDONDEO3_R), (0, 0))
            Line((0, 0), (REDONDEO3_R, 0))
        make_face()
    extrude(amount=19.9, mode=Mode.SUBTRACT)
    with BuildSketch(Plane(origin=(27.4, -2.2, -25.2), x_dir=(0, 0, -1), z_dir=(0, 1, 0))) as redondeo3_2_piece_5:
        with BuildLine():
            CenterArc((REDONDEO3_R, REDONDEO3_R), REDONDEO3_R, 180, 90)
            Line((0, REDONDEO3_R), (0, 0))
            Line((0, 0), (REDONDEO3_R, 0))
        make_face()
    extrude(amount=19.9, mode=Mode.SUBTRACT)


solid = part.part
